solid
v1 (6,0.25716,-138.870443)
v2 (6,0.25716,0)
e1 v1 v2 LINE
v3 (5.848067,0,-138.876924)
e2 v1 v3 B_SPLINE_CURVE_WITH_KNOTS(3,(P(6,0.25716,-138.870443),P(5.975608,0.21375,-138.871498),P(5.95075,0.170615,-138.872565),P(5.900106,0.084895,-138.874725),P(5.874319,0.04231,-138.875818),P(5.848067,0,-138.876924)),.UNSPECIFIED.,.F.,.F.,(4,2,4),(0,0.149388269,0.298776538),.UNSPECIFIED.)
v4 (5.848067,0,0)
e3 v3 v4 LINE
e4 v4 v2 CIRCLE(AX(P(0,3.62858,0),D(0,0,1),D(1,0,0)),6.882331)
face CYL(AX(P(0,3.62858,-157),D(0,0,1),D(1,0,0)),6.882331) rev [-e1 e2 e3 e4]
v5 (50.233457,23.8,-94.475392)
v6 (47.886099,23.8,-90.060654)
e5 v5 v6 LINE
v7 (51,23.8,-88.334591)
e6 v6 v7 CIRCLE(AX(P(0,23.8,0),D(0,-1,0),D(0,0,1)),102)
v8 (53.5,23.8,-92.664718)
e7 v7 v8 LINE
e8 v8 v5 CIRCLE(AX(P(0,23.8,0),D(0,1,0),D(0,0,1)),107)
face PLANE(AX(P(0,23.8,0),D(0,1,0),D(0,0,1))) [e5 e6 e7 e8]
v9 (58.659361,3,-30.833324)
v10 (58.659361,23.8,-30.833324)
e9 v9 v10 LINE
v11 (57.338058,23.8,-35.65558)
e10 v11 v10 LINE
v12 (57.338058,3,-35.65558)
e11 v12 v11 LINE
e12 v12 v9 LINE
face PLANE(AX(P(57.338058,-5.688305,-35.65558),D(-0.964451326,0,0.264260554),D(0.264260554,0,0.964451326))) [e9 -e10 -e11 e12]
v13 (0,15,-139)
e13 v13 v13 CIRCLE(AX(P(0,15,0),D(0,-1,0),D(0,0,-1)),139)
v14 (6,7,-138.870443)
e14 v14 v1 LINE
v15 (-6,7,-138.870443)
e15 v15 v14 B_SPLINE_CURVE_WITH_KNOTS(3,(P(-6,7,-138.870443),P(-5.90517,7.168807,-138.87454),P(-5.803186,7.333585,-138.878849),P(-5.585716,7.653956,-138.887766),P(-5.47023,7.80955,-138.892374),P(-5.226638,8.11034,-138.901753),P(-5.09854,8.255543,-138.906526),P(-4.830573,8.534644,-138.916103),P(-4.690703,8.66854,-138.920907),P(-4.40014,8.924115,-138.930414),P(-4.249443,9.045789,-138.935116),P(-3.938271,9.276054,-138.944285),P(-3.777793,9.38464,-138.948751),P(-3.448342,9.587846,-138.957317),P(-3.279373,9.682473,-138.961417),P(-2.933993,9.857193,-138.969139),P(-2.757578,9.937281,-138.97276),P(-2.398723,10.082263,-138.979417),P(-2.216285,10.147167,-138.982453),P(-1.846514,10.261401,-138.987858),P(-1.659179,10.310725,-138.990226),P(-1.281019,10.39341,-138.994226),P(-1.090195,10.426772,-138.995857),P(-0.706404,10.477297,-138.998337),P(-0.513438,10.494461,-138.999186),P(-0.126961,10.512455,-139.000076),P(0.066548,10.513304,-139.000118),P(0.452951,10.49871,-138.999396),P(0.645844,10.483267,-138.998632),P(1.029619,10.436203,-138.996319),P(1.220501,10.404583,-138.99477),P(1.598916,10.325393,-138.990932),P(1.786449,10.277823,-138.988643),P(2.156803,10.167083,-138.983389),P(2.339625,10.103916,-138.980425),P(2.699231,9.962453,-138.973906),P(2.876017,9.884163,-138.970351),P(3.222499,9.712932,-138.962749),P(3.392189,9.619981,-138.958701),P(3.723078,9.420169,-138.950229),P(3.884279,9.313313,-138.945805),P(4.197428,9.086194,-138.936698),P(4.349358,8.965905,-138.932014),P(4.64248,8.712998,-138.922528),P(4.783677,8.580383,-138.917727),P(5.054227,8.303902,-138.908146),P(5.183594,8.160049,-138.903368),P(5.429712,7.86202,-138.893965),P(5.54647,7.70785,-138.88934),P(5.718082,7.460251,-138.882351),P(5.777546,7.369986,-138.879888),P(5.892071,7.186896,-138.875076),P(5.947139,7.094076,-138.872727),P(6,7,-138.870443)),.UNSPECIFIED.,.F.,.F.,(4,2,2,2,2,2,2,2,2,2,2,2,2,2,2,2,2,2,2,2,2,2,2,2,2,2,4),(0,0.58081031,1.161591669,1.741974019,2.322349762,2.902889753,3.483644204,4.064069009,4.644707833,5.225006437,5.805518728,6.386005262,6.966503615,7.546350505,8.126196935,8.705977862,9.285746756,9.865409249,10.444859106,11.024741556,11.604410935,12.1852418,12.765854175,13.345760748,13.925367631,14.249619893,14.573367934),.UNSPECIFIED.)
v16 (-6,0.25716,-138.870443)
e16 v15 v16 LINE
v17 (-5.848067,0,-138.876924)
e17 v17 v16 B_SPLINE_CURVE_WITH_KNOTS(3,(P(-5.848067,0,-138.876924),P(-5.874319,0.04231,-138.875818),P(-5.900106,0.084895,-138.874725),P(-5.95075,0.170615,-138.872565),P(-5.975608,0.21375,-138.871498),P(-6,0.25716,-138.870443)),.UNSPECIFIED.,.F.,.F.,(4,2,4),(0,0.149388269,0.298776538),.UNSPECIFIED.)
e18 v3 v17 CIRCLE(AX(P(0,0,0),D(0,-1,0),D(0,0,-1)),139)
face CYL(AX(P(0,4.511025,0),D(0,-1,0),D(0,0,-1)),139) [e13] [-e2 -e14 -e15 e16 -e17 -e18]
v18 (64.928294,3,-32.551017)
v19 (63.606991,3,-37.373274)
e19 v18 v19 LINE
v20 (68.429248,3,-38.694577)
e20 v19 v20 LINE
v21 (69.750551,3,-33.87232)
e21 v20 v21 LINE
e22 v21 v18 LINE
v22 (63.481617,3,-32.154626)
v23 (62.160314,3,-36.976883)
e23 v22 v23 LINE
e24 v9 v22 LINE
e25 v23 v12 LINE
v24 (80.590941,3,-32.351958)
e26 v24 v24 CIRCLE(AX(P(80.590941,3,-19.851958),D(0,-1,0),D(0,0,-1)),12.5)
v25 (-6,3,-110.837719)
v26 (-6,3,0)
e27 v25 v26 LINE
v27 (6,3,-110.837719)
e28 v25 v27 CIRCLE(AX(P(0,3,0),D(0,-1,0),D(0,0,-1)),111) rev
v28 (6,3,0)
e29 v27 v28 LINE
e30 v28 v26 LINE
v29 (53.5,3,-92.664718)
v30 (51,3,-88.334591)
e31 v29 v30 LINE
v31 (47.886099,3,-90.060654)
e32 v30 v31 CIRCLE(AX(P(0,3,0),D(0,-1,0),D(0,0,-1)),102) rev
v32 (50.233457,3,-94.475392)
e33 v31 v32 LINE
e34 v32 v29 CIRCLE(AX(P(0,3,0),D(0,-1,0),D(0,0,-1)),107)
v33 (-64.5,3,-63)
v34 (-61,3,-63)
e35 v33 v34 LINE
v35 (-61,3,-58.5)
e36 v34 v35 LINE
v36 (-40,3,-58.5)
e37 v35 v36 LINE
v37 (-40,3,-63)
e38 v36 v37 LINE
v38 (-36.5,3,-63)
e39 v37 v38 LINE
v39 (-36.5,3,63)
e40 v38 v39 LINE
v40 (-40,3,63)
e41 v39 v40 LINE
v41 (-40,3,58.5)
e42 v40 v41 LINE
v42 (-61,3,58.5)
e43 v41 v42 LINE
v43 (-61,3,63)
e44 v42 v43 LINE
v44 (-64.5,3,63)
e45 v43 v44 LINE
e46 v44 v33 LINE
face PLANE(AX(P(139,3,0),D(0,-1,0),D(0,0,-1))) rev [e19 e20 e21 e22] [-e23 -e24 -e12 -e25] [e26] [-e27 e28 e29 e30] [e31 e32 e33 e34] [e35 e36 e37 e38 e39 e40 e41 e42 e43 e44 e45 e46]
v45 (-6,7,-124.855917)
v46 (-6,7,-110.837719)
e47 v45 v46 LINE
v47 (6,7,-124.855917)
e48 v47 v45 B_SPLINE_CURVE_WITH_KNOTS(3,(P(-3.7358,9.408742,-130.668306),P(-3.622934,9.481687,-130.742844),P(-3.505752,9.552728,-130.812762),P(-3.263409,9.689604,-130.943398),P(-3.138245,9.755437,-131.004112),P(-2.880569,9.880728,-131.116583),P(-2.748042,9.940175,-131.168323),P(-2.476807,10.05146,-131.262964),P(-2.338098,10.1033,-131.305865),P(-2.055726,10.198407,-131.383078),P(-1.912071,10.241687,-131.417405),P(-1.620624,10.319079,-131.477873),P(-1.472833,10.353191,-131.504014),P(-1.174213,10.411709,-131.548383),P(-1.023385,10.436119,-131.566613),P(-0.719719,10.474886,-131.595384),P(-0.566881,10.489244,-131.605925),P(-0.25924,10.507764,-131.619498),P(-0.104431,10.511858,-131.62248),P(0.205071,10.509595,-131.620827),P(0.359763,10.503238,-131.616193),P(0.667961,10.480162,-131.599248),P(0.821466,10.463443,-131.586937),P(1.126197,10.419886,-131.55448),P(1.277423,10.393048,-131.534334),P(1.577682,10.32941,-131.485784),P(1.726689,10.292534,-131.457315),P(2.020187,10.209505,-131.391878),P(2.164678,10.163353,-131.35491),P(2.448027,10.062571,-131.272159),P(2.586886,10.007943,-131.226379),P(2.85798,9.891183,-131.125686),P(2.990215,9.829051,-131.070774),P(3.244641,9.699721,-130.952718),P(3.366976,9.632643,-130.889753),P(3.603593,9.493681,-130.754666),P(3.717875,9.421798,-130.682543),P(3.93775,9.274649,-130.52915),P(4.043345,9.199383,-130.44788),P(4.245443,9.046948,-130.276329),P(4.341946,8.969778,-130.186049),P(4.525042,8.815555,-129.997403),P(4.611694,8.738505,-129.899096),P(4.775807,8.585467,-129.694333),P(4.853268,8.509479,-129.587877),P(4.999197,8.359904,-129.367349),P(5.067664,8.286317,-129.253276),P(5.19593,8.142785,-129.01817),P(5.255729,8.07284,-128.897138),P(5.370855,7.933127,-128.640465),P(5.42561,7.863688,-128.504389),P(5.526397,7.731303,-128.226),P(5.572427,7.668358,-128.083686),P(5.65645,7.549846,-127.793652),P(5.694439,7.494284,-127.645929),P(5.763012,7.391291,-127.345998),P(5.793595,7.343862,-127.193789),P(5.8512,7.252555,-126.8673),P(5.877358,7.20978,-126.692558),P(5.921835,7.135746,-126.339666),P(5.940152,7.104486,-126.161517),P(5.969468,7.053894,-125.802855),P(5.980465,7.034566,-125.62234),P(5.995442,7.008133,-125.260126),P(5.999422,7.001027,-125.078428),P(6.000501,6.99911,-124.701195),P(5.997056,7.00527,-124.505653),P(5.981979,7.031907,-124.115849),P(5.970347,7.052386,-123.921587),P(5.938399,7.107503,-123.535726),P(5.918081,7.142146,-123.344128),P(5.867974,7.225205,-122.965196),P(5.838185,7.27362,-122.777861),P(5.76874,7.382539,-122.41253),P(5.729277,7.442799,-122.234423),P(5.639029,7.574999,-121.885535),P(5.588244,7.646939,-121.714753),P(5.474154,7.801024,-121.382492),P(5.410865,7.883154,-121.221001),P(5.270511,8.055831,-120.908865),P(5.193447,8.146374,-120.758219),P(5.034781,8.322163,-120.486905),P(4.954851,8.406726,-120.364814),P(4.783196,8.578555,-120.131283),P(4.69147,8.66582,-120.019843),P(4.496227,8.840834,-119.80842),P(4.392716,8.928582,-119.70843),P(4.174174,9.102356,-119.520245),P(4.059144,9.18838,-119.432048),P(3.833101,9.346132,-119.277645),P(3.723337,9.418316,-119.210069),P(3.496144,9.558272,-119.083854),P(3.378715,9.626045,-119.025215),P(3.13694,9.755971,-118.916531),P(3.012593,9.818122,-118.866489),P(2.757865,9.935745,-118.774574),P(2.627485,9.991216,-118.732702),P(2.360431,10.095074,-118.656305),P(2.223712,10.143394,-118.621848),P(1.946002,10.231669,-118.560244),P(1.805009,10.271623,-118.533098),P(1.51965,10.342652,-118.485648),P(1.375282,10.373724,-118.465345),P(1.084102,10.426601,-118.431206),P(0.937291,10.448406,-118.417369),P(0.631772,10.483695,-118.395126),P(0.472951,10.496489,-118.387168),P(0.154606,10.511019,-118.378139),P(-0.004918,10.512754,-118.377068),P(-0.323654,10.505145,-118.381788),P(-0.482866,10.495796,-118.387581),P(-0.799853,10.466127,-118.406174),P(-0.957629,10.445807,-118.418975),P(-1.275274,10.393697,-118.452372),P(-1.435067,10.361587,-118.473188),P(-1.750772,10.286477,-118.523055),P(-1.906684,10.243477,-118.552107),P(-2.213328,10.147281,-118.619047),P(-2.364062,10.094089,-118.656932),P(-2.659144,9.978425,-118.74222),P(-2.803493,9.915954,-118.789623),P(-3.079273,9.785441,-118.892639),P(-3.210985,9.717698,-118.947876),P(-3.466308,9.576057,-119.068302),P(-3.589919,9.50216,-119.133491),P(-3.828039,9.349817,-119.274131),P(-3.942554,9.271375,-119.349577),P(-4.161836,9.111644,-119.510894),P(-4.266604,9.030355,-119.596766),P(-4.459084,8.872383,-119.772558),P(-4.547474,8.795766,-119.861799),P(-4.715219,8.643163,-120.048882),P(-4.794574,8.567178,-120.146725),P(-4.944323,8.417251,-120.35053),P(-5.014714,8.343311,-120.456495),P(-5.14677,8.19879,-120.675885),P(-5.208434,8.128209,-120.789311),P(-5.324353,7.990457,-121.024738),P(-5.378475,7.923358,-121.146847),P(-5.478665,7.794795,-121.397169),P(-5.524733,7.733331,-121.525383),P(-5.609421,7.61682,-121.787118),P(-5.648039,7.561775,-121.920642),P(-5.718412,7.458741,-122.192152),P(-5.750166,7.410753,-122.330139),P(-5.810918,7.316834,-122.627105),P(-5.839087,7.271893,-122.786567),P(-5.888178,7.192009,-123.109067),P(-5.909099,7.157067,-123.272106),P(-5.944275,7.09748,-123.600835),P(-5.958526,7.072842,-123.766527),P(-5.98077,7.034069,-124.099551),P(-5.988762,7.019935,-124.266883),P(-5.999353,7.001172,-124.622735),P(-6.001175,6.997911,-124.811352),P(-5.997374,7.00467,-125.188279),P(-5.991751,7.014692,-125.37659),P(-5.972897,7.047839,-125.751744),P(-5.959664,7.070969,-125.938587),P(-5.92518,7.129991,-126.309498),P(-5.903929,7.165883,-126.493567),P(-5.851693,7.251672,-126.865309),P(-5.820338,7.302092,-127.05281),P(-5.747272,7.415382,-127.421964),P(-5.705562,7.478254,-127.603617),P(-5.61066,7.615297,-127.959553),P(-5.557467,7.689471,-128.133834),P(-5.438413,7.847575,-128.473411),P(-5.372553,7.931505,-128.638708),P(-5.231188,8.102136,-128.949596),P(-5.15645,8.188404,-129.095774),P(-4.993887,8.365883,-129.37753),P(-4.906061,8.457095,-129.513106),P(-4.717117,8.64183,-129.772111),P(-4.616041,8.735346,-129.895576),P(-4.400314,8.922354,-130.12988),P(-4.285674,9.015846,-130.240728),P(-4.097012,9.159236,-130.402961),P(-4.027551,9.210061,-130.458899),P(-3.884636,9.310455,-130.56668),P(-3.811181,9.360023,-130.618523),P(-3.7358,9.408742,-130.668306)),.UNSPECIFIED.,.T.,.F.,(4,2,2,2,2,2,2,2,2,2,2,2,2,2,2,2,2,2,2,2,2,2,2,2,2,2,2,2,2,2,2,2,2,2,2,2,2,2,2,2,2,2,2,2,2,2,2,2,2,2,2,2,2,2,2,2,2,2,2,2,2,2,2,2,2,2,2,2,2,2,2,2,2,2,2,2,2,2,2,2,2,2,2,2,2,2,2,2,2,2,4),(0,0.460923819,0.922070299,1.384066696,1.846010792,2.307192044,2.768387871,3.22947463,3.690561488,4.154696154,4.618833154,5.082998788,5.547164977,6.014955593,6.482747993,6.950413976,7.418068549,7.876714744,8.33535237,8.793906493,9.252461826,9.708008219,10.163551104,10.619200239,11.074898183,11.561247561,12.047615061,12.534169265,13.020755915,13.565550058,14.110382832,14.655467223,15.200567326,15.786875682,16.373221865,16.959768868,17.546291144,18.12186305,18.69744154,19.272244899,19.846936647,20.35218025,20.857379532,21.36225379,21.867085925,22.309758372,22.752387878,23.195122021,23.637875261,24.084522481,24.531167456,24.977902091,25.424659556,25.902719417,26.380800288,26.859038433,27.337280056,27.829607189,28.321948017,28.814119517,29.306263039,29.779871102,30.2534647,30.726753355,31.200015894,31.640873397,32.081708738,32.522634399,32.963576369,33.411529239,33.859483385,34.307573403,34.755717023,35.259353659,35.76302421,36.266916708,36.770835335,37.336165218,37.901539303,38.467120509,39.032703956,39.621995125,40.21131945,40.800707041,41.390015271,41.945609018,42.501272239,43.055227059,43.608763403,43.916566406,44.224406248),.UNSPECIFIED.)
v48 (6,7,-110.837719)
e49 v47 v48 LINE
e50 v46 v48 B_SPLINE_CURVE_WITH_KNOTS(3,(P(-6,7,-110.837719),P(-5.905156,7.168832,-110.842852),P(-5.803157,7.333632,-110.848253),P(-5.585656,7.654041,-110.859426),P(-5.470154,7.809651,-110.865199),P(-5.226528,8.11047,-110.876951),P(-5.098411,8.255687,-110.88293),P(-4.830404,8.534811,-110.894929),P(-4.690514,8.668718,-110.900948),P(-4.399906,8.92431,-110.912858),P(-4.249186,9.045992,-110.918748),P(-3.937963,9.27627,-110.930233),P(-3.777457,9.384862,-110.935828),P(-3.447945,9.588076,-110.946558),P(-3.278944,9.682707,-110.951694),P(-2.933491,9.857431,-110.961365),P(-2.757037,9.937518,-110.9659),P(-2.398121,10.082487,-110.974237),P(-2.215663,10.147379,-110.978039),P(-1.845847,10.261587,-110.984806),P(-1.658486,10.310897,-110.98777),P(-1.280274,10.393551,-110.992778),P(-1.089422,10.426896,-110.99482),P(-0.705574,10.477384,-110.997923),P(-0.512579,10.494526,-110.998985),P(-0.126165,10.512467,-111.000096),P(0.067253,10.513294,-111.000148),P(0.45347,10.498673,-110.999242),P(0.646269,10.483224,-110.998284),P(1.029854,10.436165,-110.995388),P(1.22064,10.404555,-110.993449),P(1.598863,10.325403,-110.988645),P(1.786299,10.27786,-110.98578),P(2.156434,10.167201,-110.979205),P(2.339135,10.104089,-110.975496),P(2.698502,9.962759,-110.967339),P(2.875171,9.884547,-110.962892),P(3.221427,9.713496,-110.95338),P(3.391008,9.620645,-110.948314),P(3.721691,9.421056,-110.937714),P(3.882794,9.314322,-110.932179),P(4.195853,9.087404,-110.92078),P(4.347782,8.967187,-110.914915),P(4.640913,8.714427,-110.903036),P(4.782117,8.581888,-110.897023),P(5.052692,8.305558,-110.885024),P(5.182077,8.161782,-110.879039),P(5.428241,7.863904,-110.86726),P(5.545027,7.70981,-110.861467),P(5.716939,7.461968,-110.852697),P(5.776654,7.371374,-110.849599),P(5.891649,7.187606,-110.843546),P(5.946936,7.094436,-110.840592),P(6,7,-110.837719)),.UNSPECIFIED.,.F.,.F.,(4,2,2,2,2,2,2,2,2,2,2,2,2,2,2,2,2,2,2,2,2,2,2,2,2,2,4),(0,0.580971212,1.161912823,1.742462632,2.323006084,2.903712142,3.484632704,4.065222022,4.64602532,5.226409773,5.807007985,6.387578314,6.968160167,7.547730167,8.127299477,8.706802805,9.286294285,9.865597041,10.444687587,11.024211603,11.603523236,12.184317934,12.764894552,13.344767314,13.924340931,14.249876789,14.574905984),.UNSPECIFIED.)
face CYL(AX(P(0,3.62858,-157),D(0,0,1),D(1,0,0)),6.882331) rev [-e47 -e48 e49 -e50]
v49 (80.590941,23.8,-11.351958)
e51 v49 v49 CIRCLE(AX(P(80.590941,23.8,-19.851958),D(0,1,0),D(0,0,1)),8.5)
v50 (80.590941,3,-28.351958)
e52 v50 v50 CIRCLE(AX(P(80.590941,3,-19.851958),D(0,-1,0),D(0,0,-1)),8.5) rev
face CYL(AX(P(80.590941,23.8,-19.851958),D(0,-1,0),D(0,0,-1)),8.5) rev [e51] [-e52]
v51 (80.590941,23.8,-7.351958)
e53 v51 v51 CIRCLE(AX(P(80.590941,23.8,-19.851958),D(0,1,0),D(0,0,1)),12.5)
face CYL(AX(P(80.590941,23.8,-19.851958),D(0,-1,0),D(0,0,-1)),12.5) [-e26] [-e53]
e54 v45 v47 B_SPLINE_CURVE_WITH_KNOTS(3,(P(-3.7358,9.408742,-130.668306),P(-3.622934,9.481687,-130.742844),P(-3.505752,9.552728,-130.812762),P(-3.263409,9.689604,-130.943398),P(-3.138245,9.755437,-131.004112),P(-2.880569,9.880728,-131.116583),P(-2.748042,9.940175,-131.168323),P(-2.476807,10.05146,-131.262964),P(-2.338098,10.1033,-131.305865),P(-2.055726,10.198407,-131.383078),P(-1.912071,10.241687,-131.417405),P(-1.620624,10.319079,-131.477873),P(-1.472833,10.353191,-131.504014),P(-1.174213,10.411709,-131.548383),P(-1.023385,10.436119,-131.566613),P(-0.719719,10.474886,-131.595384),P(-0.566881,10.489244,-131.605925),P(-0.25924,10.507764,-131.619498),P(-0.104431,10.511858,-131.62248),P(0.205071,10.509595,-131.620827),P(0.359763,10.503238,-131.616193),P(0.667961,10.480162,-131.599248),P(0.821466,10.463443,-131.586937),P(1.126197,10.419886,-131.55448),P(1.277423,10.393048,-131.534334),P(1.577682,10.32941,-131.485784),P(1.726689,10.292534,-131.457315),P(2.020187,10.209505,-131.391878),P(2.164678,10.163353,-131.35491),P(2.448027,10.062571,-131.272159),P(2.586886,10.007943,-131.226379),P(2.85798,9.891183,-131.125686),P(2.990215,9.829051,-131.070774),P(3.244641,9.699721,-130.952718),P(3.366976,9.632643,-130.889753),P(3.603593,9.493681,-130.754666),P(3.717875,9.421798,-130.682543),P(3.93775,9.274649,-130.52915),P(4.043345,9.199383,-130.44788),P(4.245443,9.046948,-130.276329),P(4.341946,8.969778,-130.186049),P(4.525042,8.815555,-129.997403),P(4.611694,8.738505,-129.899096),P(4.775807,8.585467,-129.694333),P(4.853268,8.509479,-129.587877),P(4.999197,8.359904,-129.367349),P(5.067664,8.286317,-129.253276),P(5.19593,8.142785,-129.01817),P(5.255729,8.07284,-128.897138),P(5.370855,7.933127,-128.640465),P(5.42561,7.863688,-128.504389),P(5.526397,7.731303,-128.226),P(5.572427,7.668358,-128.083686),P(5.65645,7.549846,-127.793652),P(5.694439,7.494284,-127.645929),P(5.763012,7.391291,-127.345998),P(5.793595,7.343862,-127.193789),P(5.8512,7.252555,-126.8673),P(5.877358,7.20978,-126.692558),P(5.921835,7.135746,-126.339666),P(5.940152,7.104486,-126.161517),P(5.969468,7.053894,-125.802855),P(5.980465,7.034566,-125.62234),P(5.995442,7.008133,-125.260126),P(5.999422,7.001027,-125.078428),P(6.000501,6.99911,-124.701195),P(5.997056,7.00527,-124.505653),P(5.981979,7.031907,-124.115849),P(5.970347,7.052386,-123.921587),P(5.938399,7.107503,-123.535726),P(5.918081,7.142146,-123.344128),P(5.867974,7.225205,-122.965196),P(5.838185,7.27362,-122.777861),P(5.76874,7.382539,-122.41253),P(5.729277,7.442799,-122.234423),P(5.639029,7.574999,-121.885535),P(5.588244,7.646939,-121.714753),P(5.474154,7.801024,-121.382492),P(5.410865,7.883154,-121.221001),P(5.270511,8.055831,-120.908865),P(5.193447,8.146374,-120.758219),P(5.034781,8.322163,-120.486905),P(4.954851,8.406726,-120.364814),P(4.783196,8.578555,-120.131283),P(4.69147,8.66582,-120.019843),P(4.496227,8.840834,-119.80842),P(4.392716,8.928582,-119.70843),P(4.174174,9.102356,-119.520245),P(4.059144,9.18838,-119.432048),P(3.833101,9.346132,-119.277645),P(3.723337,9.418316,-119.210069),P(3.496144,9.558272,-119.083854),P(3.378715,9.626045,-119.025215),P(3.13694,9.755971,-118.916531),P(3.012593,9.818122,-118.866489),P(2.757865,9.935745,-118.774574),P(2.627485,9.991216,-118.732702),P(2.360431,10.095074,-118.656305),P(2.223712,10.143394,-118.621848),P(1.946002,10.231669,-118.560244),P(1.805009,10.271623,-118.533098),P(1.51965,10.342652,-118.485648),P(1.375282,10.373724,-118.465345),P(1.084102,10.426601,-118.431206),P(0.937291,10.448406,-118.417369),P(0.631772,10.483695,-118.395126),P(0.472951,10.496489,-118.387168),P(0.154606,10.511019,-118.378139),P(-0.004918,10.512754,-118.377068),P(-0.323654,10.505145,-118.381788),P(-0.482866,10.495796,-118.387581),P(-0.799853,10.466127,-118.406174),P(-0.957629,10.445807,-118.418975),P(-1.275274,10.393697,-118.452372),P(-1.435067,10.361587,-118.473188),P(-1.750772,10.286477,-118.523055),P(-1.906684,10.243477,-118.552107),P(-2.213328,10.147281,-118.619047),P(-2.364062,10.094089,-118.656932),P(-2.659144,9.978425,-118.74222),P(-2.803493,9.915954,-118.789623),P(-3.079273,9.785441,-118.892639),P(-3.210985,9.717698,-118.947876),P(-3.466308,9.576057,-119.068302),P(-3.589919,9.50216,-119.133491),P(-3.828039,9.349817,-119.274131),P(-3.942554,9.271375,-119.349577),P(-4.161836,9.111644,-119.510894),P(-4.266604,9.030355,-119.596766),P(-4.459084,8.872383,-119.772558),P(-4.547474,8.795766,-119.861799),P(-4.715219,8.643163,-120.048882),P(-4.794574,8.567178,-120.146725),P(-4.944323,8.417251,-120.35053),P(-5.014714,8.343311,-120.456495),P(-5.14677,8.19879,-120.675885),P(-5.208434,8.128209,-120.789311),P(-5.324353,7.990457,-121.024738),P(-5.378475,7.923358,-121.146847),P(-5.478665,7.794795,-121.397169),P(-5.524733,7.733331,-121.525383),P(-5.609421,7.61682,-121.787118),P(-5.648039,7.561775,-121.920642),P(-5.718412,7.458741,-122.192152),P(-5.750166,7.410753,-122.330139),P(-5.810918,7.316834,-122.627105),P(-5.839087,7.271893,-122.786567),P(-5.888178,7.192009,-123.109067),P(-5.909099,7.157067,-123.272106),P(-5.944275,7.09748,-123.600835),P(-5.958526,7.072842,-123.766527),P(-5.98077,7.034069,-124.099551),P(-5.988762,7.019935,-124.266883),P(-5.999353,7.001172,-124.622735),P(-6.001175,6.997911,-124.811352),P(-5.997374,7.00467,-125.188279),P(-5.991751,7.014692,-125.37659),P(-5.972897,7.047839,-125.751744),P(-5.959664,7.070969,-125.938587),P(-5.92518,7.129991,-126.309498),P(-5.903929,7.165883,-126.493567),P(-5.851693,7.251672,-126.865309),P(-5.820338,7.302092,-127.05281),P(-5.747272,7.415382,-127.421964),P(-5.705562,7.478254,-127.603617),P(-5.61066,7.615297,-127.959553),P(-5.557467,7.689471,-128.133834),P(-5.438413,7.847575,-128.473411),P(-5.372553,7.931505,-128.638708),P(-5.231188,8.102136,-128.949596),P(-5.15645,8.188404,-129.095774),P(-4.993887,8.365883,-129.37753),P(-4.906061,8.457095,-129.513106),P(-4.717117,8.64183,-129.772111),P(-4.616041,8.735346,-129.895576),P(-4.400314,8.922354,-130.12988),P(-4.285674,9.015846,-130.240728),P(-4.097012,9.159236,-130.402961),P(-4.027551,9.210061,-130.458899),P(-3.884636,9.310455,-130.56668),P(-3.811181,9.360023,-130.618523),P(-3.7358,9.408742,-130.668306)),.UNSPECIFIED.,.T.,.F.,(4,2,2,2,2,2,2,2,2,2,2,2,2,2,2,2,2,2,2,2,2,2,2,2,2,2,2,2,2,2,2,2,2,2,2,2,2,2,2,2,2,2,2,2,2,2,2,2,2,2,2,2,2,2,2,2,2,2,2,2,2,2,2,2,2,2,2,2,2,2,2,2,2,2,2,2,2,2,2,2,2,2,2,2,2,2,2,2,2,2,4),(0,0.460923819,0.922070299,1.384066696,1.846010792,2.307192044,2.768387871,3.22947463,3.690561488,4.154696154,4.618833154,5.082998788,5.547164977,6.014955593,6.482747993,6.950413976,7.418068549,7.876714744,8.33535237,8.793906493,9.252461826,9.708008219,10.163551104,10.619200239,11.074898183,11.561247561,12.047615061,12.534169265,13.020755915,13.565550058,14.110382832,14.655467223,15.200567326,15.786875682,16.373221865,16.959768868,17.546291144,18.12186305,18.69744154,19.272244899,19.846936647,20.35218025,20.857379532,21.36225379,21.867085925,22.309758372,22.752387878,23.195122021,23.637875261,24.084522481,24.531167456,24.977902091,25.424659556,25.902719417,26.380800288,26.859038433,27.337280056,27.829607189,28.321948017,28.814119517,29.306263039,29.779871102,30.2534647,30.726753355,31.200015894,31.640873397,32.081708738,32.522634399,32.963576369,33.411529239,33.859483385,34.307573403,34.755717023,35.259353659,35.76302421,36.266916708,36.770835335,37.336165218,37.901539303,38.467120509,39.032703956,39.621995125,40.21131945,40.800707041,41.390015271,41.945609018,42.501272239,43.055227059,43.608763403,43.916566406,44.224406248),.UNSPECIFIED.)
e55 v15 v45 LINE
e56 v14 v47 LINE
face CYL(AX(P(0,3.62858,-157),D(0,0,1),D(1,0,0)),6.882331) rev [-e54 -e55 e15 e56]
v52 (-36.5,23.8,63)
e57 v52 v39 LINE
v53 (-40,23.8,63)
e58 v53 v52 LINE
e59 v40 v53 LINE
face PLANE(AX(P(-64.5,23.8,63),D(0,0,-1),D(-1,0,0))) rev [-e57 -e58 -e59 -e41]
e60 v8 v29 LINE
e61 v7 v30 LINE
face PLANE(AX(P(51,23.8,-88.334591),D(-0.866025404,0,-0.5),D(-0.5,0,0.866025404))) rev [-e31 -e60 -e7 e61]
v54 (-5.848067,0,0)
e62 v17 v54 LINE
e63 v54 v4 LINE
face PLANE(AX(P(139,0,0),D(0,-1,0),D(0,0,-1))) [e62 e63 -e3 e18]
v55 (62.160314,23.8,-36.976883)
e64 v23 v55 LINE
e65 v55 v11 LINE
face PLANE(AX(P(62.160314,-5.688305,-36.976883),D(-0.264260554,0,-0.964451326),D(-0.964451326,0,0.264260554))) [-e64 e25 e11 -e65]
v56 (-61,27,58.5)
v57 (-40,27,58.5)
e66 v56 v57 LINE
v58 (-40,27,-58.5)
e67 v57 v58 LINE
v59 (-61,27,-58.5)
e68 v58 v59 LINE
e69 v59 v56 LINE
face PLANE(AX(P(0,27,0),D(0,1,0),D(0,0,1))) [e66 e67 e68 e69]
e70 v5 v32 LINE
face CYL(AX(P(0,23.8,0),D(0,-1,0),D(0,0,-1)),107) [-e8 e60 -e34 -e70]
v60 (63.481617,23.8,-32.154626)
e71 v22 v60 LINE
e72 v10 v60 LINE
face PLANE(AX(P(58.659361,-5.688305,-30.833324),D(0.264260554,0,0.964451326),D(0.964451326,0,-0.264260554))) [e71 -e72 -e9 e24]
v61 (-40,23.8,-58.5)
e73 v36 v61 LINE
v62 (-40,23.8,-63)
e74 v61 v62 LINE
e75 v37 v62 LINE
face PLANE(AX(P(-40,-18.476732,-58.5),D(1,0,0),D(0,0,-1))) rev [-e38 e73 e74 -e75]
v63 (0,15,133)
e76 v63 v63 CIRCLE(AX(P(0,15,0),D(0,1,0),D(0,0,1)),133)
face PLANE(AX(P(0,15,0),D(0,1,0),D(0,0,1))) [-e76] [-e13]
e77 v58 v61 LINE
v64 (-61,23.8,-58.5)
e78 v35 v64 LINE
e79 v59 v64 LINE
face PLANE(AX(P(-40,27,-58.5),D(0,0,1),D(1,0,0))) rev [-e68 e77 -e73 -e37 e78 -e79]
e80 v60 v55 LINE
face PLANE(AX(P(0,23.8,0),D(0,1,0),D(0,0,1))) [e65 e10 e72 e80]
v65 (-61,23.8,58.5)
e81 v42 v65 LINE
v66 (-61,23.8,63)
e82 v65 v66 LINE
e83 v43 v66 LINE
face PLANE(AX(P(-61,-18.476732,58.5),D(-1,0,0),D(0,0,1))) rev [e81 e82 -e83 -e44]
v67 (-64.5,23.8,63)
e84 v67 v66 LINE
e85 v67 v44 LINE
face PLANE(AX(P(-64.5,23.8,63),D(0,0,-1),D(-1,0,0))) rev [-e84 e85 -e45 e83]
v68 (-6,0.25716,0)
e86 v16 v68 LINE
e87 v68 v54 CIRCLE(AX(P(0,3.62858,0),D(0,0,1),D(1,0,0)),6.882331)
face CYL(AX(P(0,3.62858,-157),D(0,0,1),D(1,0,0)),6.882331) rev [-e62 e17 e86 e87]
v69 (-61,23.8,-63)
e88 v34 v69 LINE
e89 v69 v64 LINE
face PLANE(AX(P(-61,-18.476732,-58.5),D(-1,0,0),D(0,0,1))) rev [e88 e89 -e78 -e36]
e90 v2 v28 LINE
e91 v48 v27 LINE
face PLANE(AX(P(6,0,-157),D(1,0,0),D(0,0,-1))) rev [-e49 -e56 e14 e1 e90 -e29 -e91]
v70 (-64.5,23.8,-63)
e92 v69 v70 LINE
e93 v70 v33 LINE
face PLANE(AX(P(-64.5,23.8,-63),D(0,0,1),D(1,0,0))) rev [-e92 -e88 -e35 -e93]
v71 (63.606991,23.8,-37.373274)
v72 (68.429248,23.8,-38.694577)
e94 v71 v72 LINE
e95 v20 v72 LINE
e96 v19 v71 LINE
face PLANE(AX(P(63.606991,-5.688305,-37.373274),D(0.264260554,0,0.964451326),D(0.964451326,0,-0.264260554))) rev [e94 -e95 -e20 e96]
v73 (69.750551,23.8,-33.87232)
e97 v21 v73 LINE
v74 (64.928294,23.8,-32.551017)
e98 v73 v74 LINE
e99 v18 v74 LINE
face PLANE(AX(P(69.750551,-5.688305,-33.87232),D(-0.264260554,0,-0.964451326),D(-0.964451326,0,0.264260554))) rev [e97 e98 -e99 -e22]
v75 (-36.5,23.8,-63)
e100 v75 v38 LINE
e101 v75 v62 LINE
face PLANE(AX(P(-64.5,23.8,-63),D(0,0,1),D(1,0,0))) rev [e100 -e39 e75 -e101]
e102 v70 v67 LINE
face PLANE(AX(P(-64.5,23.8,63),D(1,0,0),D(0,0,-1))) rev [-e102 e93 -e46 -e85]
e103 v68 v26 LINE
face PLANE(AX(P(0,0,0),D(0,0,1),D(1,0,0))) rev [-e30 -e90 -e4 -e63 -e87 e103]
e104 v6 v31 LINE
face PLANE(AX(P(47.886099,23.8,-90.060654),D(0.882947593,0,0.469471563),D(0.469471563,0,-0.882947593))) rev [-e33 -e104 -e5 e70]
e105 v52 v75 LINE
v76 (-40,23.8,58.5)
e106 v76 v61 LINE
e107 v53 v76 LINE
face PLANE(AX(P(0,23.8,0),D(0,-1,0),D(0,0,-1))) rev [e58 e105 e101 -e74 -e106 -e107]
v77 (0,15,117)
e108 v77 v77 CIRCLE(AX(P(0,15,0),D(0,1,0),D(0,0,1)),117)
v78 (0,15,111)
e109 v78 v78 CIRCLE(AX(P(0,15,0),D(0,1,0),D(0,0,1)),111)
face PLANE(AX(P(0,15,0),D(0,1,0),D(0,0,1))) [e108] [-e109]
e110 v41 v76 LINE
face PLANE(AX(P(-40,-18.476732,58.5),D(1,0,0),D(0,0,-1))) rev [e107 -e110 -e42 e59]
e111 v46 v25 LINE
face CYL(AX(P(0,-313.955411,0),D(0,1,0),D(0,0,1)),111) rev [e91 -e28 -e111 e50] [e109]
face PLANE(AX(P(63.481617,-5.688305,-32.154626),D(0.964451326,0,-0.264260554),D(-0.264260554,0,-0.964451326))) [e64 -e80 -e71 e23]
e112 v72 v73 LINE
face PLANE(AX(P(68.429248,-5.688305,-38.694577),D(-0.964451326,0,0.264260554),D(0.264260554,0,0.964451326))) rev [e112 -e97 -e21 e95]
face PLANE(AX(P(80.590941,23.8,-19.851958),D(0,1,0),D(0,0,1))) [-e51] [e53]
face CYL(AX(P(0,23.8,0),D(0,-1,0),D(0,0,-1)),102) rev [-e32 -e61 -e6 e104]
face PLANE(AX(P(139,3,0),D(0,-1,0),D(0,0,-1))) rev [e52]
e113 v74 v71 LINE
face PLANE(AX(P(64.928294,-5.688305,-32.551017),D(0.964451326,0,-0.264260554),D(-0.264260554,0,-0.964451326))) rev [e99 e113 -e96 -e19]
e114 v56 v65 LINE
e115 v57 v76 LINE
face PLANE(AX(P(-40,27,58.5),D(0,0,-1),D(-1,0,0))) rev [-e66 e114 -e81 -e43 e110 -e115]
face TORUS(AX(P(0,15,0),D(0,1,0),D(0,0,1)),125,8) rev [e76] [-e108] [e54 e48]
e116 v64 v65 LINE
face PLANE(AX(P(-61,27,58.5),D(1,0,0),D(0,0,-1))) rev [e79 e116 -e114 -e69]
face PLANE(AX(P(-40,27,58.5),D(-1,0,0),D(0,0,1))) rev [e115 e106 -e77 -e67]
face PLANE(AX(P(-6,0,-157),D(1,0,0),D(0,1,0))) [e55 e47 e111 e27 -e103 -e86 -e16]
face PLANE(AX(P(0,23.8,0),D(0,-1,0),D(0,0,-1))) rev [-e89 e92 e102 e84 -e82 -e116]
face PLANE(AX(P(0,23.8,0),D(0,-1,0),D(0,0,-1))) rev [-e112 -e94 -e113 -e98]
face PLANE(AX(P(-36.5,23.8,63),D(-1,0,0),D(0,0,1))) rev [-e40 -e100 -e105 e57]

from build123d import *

# Parameters (mm, degrees)
SKETCH1_W                = 139
SKETCH1_H                = 15
SKETCH4_W                = 21
SKETCH4_H                = 117
BOSS_EXTRUDE1_DEPTH      = 12
SKETCH5_R                = 12.5
SKETCH5_R_2              = 8.5
BOSS_EXTRUDE2_DEPTH      = 8.8
BOSS_EXTRUDE3_DEPTH      = 8.8
SKETCH11_W               = 28
SKETCH11_H               = 126
SKETCH11_W_2             = 21
SKETCH11_H_2             = 117
BOSS_EXTRUDE5_DEPTH      = 8.8
CUT_EXTRUDE1_START       = -12
SKETCH13_R               = 111
SKETCH13_R_2             = 12.5
SKETCH13_W               = 28
SKETCH13_H               = 126
SKETCH13_R_3             = 8.5
CUT_EXTRUDE1_DEPTH       = 12
BOSS_EXTRUDE6_DEPTH      = 8.8
BOSS_EXTRUDE6_DEPTH_BACK = 12
SKETCH14_W               = 21
SKETCH14_H               = 4.5
CUT_EXTRUDE2_DEPTH       = 20.8
CUT_EXTRUDE3_START       = -139
CUT_EXTRUDE3_DEPTH       = 139


# Read off the part's stored shape, not the designer's step: Cut-Extrude3
with BuildPart() as part:
    # Sketch1 → Revolve1 (revolve)
    with BuildSketch(Plane.XY, mode=Mode.PRIVATE) as revolve1_sk:
        with Locations((69.5, 7.5)):
            Rectangle(SKETCH1_W, SKETCH1_H)
    revolve(revolve1_sk.sketch.rotate(Axis((0, 4.511025306, 0), (0, 1, 0)), 90), axis=Axis((0, 4.511025306, 0), (0, 1, 0)))

    # Sketch4 → Boss-Extrude1 (add)
    with BuildSketch(Plane(origin=(0, 15, 0), x_dir=(1, 0, 0), z_dir=(0, 1, 0))):
        with Locations((-50.5, 0)):
            Rectangle(SKETCH4_W, SKETCH4_H)
    extrude(amount=BOSS_EXTRUDE1_DEPTH)

    # Sketch5 → Boss-Extrude2 (add)
    with BuildSketch(Plane(origin=(0, 15, 0), x_dir=(1, 0, 0), z_dir=(0, 1, 0))):
        with Locations(Location((80.590940898, 19.851958221, 0), (0, 0, 270))):
            Circle(SKETCH5_R)
        with Locations(Location((80.590940898, 19.851958221, 0), (0, 0, 270))):
            Circle(SKETCH5_R_2, mode=Mode.SUBTRACT)
    extrude(amount=BOSS_EXTRUDE2_DEPTH)

    # Sketch9 → Boss-Extrude3 (add)
    with BuildSketch(Plane(origin=(0, 15, 0), x_dir=(1, 0, 0), z_dir=(0, 1, 0))):
        with BuildLine():
            Line((47.886099404, 90.060654472), (50.233457218, 94.475392436))
            ThreePointArc((50.233457218, 94.475392436), (51.874629366, 93.584308664), (53.5, 92.664718205))
            Line((53.5, 92.664718205), (51, 88.334591186))
            ThreePointArc((51, 88.334591186), (49.450581265, 89.211210128), (47.886099404, 90.060654472))
        make_face()
    extrude(amount=BOSS_EXTRUDE3_DEPTH)

    # Sketch11 → Boss-Extrude5 (add)
    with BuildSketch(Plane(origin=(0, 15, 0), x_dir=(1, 0, 0), z_dir=(0, 1, 0))):
        with Locations((-50.5, 0)):
            Rectangle(SKETCH11_W, SKETCH11_H)
        with Locations((-50.5, 0)):
            Rectangle(SKETCH11_W_2, SKETCH11_H_2, mode=Mode.SUBTRACT)
    extrude(amount=BOSS_EXTRUDE5_DEPTH)

    # Sketch13 → Cut-Extrude1 (cut)
    # profile 1 of 2: a face of its own
    with BuildSketch(Plane(origin=(0, 15, 0), x_dir=(1, 0, 0), z_dir=(0, 1, 0)).offset(CUT_EXTRUDE1_START)):
        with Locations(Location((0, 0, 0), (0, 0, 270))):
            Circle(SKETCH13_R)
        with Locations(Location((80.590940898, 19.851958221, 0), (0, 0, 90))):
            Circle(SKETCH13_R_2, mode=Mode.SUBTRACT)
        with BuildLine():
            ThreePointArc((50.233457218, 94.475392436), (51.874629366, 93.584308664), (53.5, 92.664718205))
            Line((53.5, 92.664718205), (51, 88.334591186))
            ThreePointArc((51, 88.334591186), (49.450581265, 89.211210128), (47.886099404, 90.060654472))
            Line((47.886099404, 90.060654472), (50.233457218, 94.475392436))
        make_face(mode=Mode.SUBTRACT)
        with Locations((-50.5, 0)):
            Rectangle(SKETCH13_W, SKETCH13_H, mode=Mode.SUBTRACT)
    # profile 2 of 2: a face of its own
    with BuildSketch(Plane(origin=(0, 15, 0), x_dir=(1, 0, 0), z_dir=(0, 1, 0)).offset(CUT_EXTRUDE1_START)):
        with Locations(Location((80.590940898, 19.851958221, 0), (0, 0, 90))):
            Circle(SKETCH13_R_3)
    extrude(amount=CUT_EXTRUDE1_DEPTH, mode=Mode.SUBTRACT)

    # Sketch12 → Boss-Extrude6 (add, two sides: drawn at the far end of the back side and taken through both)
    with BuildSketch(Plane(origin=(0, 15, 0), x_dir=(1, 0, 0), z_dir=(0, 1, 0)).offset(-BOSS_EXTRUDE6_DEPTH_BACK)):
        Polygon((64.928294207, 32.551017187), (63.606991435, 37.373273815), (68.429248063, 38.694576587), (69.750550835, 33.872319959), align=None)
        Polygon((63.481617219, 32.154626355), (62.160314446, 36.976882983), (57.338057819, 35.655580211), (58.659360591, 30.833323583), align=None)
    extrude(amount=BOSS_EXTRUDE6_DEPTH + BOSS_EXTRUDE6_DEPTH_BACK)

    # Sketch14 → Cut-Extrude2 (cut)
    with BuildSketch(Plane(origin=(0, 23.8, 0), x_dir=(1, 0, 0), z_dir=(0, 1, 0))):
        with Locations((-50.5, -60.75)):
            Rectangle(SKETCH14_W, SKETCH14_H)
        with Locations((-50.5, 60.75)):
            Rectangle(SKETCH14_W, SKETCH14_H)
    extrude(amount=-CUT_EXTRUDE2_DEPTH, mode=Mode.SUBTRACT)

    # Cut-Extrude3 outline → Cut-Extrude3 (cut)
    with BuildSketch(Plane.XY.offset(CUT_EXTRUDE3_START)):
        with BuildLine():
            ThreePointArc((5.848066516, 0), (5.925428493, 0.127755535), (6, 0.257159717))
            Line((6, 0.257159717), (6, 7))
            ThreePointArc((6, 7), (0, 10.510910407), (-6, 7))
            Line((-6, 7), (-6, 0.257159717))
            ThreePointArc((-6, 0.257159717), (-5.925428493, 0.127755535), (-5.848066516, 0))
            Line((-5.848066516, 0), (5.848066516, 0))
        make_face()
    extrude(amount=CUT_EXTRUDE3_DEPTH, mode=Mode.SUBTRACT)

    # Sketch2 → Cut-Revolve1 (revolve, cut)
    with BuildSketch(Plane.XY, mode=Mode.PRIVATE) as cut_revolve1_sk:
        with BuildLine():
            Line((117, 15), (133, 15))
            ThreePointArc((133, 15), (125, 7), (117, 15))
        make_face()
    revolve(cut_revolve1_sk.sketch.rotate(Axis((0, 15, 0), (0, 1, 0)), 270), axis=Axis((0, 15, 0), (0, 1, 0)), mode=Mode.SUBTRACT)


solid = part.part
